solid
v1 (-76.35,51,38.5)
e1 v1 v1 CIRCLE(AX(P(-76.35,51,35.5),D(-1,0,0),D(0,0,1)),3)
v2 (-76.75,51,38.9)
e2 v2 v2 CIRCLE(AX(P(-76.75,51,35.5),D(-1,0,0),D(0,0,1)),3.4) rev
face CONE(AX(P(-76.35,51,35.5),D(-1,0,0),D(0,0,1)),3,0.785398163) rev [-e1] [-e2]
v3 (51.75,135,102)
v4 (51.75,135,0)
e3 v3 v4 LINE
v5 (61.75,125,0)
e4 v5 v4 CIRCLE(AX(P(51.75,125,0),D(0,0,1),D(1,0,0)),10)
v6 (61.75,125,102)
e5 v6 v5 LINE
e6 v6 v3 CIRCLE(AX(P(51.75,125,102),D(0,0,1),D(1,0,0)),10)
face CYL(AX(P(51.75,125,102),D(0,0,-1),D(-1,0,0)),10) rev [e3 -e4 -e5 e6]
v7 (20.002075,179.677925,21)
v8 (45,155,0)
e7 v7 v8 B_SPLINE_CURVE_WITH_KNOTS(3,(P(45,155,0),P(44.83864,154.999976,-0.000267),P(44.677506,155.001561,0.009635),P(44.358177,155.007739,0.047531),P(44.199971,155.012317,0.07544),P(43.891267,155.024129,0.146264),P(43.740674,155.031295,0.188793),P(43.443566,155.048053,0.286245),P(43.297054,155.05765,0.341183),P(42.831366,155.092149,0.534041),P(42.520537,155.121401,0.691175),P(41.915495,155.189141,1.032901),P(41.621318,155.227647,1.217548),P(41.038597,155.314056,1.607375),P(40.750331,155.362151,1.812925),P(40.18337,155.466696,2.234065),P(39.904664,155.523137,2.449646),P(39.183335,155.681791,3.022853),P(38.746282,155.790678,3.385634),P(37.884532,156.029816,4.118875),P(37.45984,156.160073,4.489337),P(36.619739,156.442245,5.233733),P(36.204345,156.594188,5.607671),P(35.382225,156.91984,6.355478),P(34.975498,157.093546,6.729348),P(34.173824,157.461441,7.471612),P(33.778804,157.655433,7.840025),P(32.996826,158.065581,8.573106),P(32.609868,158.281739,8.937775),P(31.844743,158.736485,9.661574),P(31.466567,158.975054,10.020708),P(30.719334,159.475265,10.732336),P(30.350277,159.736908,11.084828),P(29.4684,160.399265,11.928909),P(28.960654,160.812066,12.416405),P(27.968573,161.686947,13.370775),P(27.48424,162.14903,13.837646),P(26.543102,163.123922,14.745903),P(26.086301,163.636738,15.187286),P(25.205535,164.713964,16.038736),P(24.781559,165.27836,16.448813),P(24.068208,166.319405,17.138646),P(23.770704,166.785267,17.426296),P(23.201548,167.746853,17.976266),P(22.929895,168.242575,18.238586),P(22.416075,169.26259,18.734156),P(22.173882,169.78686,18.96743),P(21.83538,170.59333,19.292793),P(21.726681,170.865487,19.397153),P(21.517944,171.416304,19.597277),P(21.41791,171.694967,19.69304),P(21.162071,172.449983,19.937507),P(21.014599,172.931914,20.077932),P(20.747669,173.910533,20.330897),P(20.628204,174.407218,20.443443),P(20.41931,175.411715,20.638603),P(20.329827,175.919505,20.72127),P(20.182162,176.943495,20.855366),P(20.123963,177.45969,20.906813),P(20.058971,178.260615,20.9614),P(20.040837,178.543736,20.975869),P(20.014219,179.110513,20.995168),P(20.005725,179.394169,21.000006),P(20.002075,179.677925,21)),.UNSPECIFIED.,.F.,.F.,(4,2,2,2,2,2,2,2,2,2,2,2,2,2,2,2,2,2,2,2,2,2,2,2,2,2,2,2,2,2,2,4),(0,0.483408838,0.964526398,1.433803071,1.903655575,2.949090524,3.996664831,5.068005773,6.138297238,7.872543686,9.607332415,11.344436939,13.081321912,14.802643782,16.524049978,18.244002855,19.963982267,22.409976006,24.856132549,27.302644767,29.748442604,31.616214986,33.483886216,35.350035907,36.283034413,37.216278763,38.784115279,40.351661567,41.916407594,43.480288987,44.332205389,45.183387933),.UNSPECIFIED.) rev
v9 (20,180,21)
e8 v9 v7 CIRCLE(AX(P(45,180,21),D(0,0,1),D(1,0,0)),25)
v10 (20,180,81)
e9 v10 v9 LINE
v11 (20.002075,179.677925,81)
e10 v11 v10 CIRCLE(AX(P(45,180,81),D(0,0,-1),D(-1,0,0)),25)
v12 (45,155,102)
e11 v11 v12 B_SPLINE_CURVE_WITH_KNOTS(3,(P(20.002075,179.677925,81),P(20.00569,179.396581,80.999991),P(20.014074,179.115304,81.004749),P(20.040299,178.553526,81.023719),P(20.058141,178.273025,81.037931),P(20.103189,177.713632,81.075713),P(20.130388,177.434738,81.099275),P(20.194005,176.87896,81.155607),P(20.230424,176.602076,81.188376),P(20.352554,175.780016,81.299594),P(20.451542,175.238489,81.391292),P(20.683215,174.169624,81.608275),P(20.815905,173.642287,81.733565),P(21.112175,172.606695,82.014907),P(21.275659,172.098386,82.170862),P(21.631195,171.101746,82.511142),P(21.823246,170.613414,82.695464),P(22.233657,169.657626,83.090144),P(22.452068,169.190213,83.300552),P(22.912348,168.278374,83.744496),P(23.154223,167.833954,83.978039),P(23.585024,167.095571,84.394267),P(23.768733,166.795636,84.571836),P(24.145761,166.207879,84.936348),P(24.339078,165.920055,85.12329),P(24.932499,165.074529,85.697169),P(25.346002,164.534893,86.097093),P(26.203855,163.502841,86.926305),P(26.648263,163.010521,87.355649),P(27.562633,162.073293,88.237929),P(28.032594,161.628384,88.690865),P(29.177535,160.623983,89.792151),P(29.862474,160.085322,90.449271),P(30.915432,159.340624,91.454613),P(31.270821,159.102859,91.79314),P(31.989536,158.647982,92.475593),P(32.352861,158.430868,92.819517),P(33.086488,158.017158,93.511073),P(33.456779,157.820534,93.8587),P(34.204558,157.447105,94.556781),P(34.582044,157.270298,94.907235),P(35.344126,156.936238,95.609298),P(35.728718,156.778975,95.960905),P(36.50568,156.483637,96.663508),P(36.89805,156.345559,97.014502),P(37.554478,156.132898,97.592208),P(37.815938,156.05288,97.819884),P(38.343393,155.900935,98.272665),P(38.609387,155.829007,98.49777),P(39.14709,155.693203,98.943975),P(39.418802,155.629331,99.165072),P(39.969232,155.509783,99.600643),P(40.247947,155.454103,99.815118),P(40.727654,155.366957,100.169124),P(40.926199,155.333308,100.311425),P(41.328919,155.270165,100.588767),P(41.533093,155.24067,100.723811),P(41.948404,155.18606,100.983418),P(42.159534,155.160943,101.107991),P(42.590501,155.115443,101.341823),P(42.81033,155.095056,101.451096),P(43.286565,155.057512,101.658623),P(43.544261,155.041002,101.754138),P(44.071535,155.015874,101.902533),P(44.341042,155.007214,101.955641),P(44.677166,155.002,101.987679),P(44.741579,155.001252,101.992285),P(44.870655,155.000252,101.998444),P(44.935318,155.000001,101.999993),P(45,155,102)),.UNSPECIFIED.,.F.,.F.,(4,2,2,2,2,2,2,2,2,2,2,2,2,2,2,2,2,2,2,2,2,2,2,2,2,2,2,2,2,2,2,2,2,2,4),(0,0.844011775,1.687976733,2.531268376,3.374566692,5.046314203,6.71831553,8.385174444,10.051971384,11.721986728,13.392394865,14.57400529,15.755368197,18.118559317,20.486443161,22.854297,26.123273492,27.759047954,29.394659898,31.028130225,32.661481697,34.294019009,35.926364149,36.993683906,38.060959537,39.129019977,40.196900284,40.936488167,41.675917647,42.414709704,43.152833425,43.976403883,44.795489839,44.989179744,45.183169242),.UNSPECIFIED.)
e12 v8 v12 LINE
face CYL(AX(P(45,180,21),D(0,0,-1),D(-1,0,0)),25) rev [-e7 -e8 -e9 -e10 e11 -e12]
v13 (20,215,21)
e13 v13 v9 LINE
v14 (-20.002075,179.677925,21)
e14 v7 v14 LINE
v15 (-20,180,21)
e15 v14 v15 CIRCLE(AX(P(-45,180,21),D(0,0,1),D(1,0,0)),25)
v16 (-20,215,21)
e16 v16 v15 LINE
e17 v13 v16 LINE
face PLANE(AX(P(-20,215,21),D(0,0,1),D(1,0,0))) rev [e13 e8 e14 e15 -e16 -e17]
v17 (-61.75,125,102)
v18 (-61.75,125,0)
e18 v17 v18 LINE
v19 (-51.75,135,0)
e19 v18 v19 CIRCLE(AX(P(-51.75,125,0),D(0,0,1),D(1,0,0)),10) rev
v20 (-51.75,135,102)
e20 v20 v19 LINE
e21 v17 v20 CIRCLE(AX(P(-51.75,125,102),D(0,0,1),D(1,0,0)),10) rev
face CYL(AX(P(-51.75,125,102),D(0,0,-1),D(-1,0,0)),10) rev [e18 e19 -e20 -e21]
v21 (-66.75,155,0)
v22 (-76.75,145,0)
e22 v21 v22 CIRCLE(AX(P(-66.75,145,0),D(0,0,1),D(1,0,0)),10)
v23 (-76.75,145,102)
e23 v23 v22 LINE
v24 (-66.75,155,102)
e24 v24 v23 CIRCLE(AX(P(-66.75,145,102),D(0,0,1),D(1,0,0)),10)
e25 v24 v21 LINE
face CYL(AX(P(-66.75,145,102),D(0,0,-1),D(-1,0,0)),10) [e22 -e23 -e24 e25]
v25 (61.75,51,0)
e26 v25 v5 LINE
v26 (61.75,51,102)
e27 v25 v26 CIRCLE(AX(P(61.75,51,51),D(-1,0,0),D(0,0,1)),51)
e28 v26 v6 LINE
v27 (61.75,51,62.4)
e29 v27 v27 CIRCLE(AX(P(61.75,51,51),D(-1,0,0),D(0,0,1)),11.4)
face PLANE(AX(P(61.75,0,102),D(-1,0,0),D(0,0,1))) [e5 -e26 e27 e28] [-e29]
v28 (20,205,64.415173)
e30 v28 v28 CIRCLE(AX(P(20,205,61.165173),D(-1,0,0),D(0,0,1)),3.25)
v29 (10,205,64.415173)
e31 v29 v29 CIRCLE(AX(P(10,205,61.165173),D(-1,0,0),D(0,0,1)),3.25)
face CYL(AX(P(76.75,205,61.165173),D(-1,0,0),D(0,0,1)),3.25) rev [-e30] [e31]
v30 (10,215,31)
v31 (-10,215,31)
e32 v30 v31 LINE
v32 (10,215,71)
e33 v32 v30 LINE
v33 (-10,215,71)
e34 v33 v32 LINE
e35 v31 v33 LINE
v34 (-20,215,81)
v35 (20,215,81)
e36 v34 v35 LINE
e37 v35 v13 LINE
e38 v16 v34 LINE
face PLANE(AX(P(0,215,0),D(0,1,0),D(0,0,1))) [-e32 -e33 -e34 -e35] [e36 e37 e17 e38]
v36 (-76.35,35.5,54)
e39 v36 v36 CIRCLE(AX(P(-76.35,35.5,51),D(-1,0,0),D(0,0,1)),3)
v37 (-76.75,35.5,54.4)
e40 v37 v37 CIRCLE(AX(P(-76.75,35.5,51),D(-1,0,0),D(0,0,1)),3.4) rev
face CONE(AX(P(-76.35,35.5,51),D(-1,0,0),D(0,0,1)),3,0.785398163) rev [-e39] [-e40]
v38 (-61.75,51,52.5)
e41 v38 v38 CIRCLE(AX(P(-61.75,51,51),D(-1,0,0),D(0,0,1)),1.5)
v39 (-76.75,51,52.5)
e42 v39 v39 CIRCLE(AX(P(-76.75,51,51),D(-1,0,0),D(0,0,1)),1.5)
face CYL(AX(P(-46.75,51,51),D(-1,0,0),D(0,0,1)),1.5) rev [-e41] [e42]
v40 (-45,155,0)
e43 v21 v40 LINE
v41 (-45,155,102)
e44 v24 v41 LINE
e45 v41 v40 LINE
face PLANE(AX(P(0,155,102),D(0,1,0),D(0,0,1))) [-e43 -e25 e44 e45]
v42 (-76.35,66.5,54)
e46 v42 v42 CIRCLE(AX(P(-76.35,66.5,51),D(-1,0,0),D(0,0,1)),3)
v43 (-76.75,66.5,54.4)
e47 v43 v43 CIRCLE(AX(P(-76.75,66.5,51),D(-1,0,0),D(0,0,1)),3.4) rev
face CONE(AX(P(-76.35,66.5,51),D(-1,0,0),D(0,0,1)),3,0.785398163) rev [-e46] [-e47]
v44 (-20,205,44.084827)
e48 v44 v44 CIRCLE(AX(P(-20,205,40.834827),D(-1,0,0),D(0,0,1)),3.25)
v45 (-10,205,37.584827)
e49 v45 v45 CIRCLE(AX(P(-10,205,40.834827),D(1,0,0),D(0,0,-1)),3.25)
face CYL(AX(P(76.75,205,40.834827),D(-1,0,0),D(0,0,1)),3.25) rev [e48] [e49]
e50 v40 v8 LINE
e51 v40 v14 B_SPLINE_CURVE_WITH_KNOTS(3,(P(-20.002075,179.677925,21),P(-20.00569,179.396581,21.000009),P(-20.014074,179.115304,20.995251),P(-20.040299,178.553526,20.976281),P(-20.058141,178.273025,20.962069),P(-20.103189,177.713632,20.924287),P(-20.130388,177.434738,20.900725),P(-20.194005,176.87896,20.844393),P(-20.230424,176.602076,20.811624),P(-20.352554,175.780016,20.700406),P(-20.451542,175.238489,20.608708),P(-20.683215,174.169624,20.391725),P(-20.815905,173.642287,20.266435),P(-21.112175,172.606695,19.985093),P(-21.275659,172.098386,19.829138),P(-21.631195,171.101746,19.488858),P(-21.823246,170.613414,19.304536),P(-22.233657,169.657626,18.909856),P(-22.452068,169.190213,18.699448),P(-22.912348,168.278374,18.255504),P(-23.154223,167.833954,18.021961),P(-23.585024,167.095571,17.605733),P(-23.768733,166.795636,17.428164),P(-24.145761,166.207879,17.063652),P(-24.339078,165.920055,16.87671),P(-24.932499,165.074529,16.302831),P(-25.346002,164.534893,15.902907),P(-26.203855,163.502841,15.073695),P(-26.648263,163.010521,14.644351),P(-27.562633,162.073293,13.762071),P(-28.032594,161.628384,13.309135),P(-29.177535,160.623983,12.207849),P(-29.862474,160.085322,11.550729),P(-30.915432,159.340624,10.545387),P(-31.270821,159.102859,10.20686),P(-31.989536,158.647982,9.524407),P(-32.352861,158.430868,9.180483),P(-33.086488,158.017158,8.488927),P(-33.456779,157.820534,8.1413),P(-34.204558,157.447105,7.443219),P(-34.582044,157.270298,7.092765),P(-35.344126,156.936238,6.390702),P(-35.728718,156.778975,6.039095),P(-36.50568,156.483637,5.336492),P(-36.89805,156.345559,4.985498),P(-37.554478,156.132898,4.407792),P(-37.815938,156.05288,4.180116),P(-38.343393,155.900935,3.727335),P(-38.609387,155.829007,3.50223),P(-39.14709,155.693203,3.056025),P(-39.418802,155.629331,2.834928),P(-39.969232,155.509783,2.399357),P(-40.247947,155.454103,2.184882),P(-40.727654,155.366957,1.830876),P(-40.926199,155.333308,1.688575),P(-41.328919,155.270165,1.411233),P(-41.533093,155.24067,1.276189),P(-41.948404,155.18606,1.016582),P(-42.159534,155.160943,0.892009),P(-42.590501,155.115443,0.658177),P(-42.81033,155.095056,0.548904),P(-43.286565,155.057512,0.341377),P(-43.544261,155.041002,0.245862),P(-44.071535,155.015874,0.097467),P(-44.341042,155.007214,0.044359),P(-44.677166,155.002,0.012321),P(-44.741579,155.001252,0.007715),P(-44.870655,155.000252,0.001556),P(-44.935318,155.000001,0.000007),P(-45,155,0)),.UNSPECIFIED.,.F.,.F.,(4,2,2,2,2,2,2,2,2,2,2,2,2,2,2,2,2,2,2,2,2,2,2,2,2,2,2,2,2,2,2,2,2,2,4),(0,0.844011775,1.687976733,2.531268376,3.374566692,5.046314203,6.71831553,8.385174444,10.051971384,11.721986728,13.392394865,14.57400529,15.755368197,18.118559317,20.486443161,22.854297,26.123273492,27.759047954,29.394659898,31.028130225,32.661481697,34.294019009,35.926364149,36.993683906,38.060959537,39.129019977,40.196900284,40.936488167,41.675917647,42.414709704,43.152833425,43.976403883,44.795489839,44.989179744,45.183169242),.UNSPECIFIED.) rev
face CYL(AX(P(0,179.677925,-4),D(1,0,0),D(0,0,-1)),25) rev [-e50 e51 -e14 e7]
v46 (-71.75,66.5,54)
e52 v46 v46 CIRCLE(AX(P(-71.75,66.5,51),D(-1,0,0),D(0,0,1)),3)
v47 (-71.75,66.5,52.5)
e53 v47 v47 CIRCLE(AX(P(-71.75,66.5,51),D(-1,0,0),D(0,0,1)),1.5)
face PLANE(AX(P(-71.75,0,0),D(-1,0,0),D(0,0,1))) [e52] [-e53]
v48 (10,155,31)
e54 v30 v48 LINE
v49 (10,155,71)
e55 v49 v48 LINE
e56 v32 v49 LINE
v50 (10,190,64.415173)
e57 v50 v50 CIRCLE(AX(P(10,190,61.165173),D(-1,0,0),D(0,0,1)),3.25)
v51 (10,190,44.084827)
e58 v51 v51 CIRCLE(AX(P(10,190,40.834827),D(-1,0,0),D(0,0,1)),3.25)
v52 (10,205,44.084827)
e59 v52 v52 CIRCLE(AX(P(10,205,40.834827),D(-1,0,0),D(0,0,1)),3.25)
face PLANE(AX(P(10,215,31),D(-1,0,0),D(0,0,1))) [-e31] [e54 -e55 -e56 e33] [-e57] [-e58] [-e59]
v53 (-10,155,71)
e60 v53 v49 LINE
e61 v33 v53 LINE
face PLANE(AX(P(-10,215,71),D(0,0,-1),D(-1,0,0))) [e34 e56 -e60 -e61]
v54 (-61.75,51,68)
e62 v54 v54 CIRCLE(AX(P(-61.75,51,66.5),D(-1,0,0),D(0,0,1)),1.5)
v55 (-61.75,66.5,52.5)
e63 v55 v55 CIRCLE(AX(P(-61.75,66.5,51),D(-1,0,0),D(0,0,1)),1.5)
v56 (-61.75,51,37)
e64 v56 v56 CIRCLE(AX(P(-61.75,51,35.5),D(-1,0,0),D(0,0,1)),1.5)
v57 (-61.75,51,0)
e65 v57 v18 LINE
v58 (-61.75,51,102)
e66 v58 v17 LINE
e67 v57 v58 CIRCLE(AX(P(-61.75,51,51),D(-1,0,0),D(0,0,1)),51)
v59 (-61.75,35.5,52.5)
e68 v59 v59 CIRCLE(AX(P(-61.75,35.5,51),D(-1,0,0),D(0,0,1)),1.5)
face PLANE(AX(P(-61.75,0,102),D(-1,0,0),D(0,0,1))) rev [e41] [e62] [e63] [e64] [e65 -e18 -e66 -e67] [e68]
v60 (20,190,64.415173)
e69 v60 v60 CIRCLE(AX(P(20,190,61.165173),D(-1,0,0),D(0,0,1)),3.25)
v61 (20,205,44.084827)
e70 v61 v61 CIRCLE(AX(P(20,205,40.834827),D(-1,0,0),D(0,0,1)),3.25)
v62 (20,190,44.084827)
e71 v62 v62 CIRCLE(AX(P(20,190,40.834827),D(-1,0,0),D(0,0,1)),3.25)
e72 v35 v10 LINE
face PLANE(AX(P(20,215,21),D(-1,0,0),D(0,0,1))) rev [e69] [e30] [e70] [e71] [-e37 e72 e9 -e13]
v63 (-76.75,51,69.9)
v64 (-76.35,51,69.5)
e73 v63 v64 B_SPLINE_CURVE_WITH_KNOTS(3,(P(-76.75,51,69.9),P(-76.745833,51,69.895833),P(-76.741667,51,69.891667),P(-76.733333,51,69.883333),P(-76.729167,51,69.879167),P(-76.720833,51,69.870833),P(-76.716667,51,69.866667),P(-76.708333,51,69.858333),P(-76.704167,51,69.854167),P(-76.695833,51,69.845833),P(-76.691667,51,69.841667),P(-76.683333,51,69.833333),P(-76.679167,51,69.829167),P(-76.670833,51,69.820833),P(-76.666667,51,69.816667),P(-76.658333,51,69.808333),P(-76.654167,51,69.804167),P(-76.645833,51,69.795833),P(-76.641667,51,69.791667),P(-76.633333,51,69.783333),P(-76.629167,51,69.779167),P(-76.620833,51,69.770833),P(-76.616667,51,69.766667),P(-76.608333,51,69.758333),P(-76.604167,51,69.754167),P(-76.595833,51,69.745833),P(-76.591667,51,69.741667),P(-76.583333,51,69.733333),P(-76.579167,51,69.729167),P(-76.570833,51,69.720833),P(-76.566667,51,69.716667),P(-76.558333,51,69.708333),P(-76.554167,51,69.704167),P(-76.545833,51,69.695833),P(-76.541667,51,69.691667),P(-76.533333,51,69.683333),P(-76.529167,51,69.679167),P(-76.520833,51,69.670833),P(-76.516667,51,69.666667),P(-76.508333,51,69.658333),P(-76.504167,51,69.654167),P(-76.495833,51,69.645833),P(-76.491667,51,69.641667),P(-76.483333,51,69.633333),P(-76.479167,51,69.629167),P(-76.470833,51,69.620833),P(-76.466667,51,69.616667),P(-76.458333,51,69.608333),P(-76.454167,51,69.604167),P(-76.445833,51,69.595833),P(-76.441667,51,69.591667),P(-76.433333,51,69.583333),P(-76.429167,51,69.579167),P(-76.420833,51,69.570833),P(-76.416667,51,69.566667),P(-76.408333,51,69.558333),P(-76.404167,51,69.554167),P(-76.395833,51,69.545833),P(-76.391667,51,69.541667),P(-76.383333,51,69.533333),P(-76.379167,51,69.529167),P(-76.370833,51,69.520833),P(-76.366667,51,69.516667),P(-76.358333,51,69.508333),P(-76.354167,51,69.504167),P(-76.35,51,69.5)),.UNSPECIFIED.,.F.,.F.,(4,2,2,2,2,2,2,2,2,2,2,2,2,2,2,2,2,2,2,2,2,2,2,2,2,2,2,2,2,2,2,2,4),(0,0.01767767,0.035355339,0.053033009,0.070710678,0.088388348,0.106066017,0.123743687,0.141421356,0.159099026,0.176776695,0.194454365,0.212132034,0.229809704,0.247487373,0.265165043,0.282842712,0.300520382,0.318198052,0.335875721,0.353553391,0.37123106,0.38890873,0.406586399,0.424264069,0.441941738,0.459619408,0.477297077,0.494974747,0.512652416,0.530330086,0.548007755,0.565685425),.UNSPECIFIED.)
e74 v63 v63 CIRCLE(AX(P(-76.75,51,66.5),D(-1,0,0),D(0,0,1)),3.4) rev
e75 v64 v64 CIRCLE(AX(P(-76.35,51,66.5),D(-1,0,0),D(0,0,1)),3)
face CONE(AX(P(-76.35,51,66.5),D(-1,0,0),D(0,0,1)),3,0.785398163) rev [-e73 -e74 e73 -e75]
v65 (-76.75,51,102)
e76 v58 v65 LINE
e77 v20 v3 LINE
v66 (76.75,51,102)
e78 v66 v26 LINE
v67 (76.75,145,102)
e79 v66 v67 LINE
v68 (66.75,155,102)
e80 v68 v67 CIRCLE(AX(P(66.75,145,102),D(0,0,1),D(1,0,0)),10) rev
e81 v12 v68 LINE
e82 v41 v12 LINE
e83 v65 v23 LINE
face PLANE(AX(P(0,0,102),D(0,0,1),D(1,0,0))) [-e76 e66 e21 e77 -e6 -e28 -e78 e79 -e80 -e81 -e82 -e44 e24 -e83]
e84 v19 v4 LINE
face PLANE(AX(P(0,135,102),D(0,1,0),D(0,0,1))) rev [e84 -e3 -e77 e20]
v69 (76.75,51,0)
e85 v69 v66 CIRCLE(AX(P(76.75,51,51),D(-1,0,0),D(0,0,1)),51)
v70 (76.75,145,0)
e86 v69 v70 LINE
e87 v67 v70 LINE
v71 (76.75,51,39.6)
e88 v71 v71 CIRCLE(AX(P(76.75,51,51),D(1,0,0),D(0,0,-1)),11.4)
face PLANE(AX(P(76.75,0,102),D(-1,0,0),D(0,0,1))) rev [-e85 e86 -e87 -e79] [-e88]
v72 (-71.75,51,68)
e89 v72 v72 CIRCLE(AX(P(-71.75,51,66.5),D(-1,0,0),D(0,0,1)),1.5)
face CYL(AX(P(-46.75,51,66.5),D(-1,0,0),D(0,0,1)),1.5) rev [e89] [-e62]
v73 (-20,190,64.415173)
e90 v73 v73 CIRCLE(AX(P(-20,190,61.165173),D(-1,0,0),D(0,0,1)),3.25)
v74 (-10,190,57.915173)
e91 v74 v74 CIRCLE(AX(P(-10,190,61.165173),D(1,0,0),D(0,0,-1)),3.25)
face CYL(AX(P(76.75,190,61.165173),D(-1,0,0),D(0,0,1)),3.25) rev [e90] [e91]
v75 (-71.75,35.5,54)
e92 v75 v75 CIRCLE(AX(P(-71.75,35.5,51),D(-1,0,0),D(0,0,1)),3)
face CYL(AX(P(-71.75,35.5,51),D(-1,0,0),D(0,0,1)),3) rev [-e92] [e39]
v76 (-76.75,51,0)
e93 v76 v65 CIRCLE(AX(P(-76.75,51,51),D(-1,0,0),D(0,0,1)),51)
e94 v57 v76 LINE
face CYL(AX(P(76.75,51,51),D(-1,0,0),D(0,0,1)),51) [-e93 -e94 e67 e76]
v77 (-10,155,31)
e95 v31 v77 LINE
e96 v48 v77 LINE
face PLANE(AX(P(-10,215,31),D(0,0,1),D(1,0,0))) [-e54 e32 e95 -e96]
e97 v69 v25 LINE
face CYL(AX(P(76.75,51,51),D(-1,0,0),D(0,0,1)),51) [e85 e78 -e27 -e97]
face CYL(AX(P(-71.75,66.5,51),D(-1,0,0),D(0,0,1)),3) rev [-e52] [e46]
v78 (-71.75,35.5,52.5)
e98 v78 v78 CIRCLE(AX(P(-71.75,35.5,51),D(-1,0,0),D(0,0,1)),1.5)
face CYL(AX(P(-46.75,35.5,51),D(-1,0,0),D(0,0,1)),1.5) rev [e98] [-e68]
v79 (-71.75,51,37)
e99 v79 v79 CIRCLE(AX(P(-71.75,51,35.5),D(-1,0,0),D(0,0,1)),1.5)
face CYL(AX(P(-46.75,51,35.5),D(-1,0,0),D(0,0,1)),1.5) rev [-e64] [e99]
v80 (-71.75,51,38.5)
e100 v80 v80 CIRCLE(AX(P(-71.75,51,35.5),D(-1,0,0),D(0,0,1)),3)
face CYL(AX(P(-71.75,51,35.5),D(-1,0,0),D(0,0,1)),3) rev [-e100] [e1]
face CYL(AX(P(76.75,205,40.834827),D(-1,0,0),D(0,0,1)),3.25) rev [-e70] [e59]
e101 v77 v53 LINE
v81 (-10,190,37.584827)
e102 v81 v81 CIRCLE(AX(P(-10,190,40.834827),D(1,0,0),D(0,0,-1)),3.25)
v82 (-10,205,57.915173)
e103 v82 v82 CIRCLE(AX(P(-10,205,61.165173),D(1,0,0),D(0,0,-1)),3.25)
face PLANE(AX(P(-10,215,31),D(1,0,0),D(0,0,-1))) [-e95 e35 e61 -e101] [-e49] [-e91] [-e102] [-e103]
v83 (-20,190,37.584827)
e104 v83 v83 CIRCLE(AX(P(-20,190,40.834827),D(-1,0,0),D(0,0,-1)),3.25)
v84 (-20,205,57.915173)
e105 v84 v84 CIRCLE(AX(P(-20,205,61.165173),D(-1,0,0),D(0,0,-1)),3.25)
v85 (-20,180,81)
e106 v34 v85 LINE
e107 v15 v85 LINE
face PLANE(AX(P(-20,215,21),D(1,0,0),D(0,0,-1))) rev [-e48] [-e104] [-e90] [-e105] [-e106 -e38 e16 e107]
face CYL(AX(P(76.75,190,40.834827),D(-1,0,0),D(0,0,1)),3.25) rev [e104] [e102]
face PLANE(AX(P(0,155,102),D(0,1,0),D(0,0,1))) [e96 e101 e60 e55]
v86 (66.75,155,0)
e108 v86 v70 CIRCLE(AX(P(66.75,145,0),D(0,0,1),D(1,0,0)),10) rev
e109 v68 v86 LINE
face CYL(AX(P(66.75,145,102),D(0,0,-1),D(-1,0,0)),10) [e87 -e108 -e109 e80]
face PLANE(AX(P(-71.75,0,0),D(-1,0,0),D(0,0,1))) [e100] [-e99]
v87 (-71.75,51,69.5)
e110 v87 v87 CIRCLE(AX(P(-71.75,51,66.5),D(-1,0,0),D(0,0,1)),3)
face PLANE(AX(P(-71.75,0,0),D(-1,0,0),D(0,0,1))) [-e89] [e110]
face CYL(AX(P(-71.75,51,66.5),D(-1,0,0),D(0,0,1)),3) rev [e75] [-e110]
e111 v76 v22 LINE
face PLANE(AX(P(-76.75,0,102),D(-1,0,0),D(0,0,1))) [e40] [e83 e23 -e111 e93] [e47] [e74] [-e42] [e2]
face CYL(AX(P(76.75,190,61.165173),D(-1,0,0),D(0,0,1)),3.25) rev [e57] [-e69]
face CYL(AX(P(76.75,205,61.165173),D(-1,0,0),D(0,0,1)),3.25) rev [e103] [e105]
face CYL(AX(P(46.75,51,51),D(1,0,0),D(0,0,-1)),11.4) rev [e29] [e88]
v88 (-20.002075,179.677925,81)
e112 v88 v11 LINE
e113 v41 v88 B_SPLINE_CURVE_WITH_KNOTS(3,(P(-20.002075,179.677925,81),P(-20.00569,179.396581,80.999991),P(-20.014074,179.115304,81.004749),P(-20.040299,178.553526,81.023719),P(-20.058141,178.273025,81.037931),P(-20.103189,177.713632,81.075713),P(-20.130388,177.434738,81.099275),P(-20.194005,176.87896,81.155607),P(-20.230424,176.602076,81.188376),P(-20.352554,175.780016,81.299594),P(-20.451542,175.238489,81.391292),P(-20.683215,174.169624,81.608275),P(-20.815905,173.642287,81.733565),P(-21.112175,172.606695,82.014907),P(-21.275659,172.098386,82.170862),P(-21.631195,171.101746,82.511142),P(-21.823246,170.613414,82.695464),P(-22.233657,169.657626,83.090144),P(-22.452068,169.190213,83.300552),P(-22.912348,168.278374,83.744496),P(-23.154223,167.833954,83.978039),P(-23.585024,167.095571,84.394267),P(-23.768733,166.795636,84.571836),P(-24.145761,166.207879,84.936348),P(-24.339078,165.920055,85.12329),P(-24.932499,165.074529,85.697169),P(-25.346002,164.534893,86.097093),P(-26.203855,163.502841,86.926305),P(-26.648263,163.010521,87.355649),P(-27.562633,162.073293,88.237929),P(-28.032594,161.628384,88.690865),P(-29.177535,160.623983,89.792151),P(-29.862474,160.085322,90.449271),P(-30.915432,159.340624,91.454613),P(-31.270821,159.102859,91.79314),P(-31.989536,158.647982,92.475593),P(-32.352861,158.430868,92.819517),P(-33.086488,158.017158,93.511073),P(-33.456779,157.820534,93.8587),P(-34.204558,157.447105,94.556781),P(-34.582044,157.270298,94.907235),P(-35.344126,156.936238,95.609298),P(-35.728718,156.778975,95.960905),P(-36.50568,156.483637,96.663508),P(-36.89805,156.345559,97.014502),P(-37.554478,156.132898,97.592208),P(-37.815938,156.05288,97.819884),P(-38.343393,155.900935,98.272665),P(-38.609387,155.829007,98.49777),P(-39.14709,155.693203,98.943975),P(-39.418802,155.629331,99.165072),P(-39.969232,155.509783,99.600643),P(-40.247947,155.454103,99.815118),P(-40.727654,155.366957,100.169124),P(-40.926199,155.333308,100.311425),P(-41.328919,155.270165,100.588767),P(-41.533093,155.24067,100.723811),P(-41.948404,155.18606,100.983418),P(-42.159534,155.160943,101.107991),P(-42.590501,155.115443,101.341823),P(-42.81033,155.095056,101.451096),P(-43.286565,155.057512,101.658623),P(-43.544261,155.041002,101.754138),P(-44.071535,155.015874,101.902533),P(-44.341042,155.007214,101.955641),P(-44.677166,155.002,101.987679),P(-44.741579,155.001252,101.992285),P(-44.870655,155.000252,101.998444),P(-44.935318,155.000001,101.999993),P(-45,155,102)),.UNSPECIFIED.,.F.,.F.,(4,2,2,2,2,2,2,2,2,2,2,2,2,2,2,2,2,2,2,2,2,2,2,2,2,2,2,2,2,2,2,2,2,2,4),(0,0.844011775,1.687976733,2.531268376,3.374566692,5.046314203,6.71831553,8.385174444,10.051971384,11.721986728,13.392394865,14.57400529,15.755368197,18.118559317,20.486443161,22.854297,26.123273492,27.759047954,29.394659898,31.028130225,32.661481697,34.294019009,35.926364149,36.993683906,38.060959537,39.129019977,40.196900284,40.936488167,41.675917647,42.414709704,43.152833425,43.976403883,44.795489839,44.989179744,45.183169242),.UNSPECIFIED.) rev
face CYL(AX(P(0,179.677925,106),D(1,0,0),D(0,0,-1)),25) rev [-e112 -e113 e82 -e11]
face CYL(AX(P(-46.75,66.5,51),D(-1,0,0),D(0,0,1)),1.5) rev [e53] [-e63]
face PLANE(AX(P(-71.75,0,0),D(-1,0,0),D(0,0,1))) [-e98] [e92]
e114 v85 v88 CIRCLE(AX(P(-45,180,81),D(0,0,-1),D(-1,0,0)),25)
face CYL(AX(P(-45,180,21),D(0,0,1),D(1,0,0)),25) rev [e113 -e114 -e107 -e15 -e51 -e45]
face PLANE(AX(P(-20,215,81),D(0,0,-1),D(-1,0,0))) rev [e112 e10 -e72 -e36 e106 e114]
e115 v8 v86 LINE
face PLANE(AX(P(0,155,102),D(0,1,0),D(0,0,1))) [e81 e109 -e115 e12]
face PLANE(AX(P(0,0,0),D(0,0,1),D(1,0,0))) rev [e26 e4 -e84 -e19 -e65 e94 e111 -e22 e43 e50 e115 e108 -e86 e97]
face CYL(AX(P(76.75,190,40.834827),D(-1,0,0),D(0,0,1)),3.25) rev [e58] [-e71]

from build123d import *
from build123d.topology import SkipClean

# Parameters (mm, degrees)
SALIENTE_EXTRUIR1_DEPTH = 102
CORTAR_EXTRUIR1_DEPTH   = 241.813724692
CROQUIS3_R              = 1.5
CORTAR_EXTRUIR2_DEPTH   = 30
CROQUIS3_3_R            = 3
CROQUIS3_3_R_2          = 1.5
CORTAR_EXTRUIR3_DEPTH   = 5
CHAFL_N1_SIZE           = 0.4
CROQUIS5_R              = 11.4
CORTAR_EXTRUIR4_DEPTH   = 30
CROQUIS6_W              = 40
CROQUIS6_H              = 60
CROQUIS6_W_2            = 20
CROQUIS6_H_2            = 40
SALIENTE_EXTRUIR2_DEPTH = 60
REDONDEO2_START         = -20
REDONDEO2_DEPTH         = 40
REDONDEO2_START_2       = -5.347e-06
REDONDEO2_2_DEPTH       = 102.000005347
REDONDEO2_START_3       = -76.75
REDONDEO2_3_DEPTH       = 153.5
CROQUIS7_R              = 3.25
CORTAR_EXTRUIR5_DEPTH   = 257.884370664


with BuildPart() as part:
    # Croquis1 → Saliente-Extruir1 (new body)
    with BuildSketch(Plane.XY):
        with BuildLine():
            Line((-61.75, 0), (-76.75, 0))
            Line((-76.75, 0), (-76.75, 145))
            ThreePointArc((-76.75, 145), (-73.821067812, 152.071067812), (-66.75, 155))
            Line((-66.75, 155), (66.75, 155))
            ThreePointArc((66.75, 155), (73.821067812, 152.071067812), (76.75, 145))
            Line((76.75, 145), (76.75, 0))
            Line((76.75, 0), (61.75, 0))
            Line((61.75, 0), (61.75, 125))
            ThreePointArc((61.75, 125), (58.821067812, 132.071067812), (51.75, 135))
            Line((51.75, 135), (-51.75, 135))
            ThreePointArc((-51.75, 135), (-58.821067812, 132.071067812), (-61.75, 125))
            Line((-61.75, 125), (-61.75, 0))
        make_face()
    extrude(amount=SALIENTE_EXTRUIR1_DEPTH)

    # Croquis2 → Cortar-Extruir1 (cut, through all)
    with BuildSketch(Plane.ZY.offset(76.75)):
        with BuildLine():
            ThreePointArc((51, 0), (14.937554159, 14.937554159), (0, 51))
            Line((0, 51), (0, 0))
            Line((0, 0), (51, 0))
        make_face()
        with BuildLine():
            Line((102, 0), (102, 51))
            ThreePointArc((102, 51), (87.062445841, 14.937554159), (51, 0))
            Line((51, 0), (102, 0))
        make_face()
    extrude(amount=-CORTAR_EXTRUIR1_DEPTH, mode=Mode.SUBTRACT)

    # Croquis3 → Cortar-Extruir2 (cut)
    with BuildSketch(Plane.ZY.offset(76.75)):
        with Locations((35.5, 51)):
            Circle(CROQUIS3_R)
        with Locations((51, 66.5)):
            Circle(CROQUIS3_R)
        with Locations((66.5, 51)):
            Circle(CROQUIS3_R)
        with Locations((51, 51)):
            Circle(CROQUIS3_R)
        with Locations((51, 35.5)):
            Circle(CROQUIS3_R)
    extrude(amount=-CORTAR_EXTRUIR2_DEPTH, mode=Mode.SUBTRACT)

    # Croquis3<3> → Cortar-Extruir3 (cut)
    # profile 1 of 4: a face of its own
    with BuildSketch(Plane.ZY.offset(76.75)):
        with Locations((35.5, 51)):
            Circle(CROQUIS3_3_R)
        with Locations((35.5, 51)):
            Circle(CROQUIS3_3_R_2, mode=Mode.SUBTRACT)
    # profile 2 of 4: a face of its own
    with BuildSketch(Plane.ZY.offset(76.75)):
        with Locations((51, 66.5)):
            Circle(CROQUIS3_3_R)
        with Locations((51, 66.5)):
            Circle(CROQUIS3_3_R_2, mode=Mode.SUBTRACT)
    # profile 3 of 4: a face of its own
    with BuildSketch(Plane.ZY.offset(76.75)):
        with Locations((66.5, 51)):
            Circle(CROQUIS3_3_R)
        with Locations((66.5, 51)):
            Circle(CROQUIS3_3_R_2, mode=Mode.SUBTRACT)
    # profile 4 of 4: a face of its own
    with BuildSketch(Plane.ZY.offset(76.75)):
        with Locations((51, 35.5)):
            Circle(CROQUIS3_3_R)
        with Locations((51, 35.5)):
            Circle(CROQUIS3_3_R_2, mode=Mode.SUBTRACT)
    extrude(amount=-CORTAR_EXTRUIR3_DEPTH, mode=Mode.SUBTRACT)

    # Chaflán1
    chafl_n1_edges = [part.edges().sort_by_distance(p)[0] for p in [
        (-76.75, 51, 32.5),
        (-76.75, 66.5, 48),
        (-76.75, 51, 63.5),
        (-76.75, 35.5, 48),
    ]]
    chamfer(chafl_n1_edges, length=CHAFL_N1_SIZE)

    # Croquis5 → Cortar-Extruir4 (cut)
    with BuildSketch(Plane(origin=(76.75, 0, 0), x_dir=(0, 0, -1), z_dir=(1, 0, 0))):
        with Locations((-51, 51)):
            Circle(CROQUIS5_R)
    extrude(amount=-CORTAR_EXTRUIR4_DEPTH, mode=Mode.SUBTRACT)

    # Croquis6 → Saliente-Extruir2 (add)
    with BuildSketch(Plane(origin=(0, 155, 0), x_dir=(1, 0, 0), z_dir=(0, 1, 0))):
        with Locations((0, -51)):
            Rectangle(CROQUIS6_W, CROQUIS6_H)
        with Locations((0, -51)):
            Rectangle(CROQUIS6_W_2, CROQUIS6_H_2, mode=Mode.SUBTRACT)
    extrude(amount=SALIENTE_EXTRUIR2_DEPTH)

    # Redondeo2: read off the stored shape, not the designer's step
    # Redondeo2 outline → Redondeo2 (add)
    with BuildSketch(Plane.YZ.offset(REDONDEO2_START)):
        with BuildLine():
            Line((179.677925359, 21), (155, 21))
            Line((155, 21), (155, 0))
            ThreePointArc((155, 0), (163.476073612, 15.039432765), (179.677925359, 21))
        make_face()
        with BuildLine():
            ThreePointArc((179.677925359, 81), (163.476040765, 86.960595188), (154.999986198, 102.000085152))
            Line((154.999986198, 102.000085152), (155, 81))
            Line((155, 81), (179.677925359, 81))
        make_face()
    extrude(amount=REDONDEO2_DEPTH)

    # Redondeo2 2 outline → Redondeo2 2 (add)
    with BuildSketch(Plane.XY.offset(REDONDEO2_START_2)):
        with BuildLine():
            Line((20, 155), (45, 155))
            ThreePointArc((45, 155), (27.32233047, 162.32233047), (20, 180))
            Line((20, 180), (20, 155))
        make_face()
        with BuildLine():
            Line((-45, 155), (-20, 155))
            Line((-20, 155), (-20, 180))
            ThreePointArc((-20, 180), (-27.32233047, 162.32233047), (-45, 155))
        make_face()
    extrude(amount=REDONDEO2_2_DEPTH)

    # Redondeo2 3 outline → Redondeo2 3 (cut)
    with SkipClean():  # the faces are left unmerged after this step: merging them gives an invalid solid
        with BuildSketch(Plane.YZ.offset(REDONDEO2_START_3)):
            with BuildLine():
                Line((180, 102), (154.999986198, 102.000085152))
                ThreePointArc((154.999986198, 102.000085152), (163.476040765, 86.960595188), (179.677925359, 81))
                Line((179.677925359, 81), (181, 81))
                Line((181, 81), (181, 102))
                Line((181, 102), (180, 102))
            make_face()
            with BuildLine():
                Line((181, -2), (181, 21))
                Line((181, 21), (179.677925359, 21))
                ThreePointArc((179.677925359, 21), (163.476071603, 15.039431055), (154.999999156, -5.21e-06))
                Line((154.999999156, -5.21e-06), (154.67583917, -2))
                Line((154.67583917, -2), (181, -2))
            make_face()
        extrude(amount=REDONDEO2_3_DEPTH, mode=Mode.SUBTRACT)
    add(part.part.scale(1), mode=Mode.REPLACE)  # the faces are merged on a copy

    # Croquis7 → Cortar-Extruir5 (cut, through all)
    with BuildSketch(Plane.ZY.offset(20)):
        with Locations((40.834826991, 205)):
            Circle(CROQUIS7_R)
        with Locations(Location((61.165173009, 205, 0), (0, 0, 180))):
            Circle(CROQUIS7_R)
        with Locations((61.165173009, 190)):
            Circle(CROQUIS7_R)
        with Locations(Location((40.834826991, 190, 0), (0, 0, 180))):
            Circle(CROQUIS7_R)
    extrude(amount=-CORTAR_EXTRUIR5_DEPTH, mode=Mode.SUBTRACT)


solid = part.part
